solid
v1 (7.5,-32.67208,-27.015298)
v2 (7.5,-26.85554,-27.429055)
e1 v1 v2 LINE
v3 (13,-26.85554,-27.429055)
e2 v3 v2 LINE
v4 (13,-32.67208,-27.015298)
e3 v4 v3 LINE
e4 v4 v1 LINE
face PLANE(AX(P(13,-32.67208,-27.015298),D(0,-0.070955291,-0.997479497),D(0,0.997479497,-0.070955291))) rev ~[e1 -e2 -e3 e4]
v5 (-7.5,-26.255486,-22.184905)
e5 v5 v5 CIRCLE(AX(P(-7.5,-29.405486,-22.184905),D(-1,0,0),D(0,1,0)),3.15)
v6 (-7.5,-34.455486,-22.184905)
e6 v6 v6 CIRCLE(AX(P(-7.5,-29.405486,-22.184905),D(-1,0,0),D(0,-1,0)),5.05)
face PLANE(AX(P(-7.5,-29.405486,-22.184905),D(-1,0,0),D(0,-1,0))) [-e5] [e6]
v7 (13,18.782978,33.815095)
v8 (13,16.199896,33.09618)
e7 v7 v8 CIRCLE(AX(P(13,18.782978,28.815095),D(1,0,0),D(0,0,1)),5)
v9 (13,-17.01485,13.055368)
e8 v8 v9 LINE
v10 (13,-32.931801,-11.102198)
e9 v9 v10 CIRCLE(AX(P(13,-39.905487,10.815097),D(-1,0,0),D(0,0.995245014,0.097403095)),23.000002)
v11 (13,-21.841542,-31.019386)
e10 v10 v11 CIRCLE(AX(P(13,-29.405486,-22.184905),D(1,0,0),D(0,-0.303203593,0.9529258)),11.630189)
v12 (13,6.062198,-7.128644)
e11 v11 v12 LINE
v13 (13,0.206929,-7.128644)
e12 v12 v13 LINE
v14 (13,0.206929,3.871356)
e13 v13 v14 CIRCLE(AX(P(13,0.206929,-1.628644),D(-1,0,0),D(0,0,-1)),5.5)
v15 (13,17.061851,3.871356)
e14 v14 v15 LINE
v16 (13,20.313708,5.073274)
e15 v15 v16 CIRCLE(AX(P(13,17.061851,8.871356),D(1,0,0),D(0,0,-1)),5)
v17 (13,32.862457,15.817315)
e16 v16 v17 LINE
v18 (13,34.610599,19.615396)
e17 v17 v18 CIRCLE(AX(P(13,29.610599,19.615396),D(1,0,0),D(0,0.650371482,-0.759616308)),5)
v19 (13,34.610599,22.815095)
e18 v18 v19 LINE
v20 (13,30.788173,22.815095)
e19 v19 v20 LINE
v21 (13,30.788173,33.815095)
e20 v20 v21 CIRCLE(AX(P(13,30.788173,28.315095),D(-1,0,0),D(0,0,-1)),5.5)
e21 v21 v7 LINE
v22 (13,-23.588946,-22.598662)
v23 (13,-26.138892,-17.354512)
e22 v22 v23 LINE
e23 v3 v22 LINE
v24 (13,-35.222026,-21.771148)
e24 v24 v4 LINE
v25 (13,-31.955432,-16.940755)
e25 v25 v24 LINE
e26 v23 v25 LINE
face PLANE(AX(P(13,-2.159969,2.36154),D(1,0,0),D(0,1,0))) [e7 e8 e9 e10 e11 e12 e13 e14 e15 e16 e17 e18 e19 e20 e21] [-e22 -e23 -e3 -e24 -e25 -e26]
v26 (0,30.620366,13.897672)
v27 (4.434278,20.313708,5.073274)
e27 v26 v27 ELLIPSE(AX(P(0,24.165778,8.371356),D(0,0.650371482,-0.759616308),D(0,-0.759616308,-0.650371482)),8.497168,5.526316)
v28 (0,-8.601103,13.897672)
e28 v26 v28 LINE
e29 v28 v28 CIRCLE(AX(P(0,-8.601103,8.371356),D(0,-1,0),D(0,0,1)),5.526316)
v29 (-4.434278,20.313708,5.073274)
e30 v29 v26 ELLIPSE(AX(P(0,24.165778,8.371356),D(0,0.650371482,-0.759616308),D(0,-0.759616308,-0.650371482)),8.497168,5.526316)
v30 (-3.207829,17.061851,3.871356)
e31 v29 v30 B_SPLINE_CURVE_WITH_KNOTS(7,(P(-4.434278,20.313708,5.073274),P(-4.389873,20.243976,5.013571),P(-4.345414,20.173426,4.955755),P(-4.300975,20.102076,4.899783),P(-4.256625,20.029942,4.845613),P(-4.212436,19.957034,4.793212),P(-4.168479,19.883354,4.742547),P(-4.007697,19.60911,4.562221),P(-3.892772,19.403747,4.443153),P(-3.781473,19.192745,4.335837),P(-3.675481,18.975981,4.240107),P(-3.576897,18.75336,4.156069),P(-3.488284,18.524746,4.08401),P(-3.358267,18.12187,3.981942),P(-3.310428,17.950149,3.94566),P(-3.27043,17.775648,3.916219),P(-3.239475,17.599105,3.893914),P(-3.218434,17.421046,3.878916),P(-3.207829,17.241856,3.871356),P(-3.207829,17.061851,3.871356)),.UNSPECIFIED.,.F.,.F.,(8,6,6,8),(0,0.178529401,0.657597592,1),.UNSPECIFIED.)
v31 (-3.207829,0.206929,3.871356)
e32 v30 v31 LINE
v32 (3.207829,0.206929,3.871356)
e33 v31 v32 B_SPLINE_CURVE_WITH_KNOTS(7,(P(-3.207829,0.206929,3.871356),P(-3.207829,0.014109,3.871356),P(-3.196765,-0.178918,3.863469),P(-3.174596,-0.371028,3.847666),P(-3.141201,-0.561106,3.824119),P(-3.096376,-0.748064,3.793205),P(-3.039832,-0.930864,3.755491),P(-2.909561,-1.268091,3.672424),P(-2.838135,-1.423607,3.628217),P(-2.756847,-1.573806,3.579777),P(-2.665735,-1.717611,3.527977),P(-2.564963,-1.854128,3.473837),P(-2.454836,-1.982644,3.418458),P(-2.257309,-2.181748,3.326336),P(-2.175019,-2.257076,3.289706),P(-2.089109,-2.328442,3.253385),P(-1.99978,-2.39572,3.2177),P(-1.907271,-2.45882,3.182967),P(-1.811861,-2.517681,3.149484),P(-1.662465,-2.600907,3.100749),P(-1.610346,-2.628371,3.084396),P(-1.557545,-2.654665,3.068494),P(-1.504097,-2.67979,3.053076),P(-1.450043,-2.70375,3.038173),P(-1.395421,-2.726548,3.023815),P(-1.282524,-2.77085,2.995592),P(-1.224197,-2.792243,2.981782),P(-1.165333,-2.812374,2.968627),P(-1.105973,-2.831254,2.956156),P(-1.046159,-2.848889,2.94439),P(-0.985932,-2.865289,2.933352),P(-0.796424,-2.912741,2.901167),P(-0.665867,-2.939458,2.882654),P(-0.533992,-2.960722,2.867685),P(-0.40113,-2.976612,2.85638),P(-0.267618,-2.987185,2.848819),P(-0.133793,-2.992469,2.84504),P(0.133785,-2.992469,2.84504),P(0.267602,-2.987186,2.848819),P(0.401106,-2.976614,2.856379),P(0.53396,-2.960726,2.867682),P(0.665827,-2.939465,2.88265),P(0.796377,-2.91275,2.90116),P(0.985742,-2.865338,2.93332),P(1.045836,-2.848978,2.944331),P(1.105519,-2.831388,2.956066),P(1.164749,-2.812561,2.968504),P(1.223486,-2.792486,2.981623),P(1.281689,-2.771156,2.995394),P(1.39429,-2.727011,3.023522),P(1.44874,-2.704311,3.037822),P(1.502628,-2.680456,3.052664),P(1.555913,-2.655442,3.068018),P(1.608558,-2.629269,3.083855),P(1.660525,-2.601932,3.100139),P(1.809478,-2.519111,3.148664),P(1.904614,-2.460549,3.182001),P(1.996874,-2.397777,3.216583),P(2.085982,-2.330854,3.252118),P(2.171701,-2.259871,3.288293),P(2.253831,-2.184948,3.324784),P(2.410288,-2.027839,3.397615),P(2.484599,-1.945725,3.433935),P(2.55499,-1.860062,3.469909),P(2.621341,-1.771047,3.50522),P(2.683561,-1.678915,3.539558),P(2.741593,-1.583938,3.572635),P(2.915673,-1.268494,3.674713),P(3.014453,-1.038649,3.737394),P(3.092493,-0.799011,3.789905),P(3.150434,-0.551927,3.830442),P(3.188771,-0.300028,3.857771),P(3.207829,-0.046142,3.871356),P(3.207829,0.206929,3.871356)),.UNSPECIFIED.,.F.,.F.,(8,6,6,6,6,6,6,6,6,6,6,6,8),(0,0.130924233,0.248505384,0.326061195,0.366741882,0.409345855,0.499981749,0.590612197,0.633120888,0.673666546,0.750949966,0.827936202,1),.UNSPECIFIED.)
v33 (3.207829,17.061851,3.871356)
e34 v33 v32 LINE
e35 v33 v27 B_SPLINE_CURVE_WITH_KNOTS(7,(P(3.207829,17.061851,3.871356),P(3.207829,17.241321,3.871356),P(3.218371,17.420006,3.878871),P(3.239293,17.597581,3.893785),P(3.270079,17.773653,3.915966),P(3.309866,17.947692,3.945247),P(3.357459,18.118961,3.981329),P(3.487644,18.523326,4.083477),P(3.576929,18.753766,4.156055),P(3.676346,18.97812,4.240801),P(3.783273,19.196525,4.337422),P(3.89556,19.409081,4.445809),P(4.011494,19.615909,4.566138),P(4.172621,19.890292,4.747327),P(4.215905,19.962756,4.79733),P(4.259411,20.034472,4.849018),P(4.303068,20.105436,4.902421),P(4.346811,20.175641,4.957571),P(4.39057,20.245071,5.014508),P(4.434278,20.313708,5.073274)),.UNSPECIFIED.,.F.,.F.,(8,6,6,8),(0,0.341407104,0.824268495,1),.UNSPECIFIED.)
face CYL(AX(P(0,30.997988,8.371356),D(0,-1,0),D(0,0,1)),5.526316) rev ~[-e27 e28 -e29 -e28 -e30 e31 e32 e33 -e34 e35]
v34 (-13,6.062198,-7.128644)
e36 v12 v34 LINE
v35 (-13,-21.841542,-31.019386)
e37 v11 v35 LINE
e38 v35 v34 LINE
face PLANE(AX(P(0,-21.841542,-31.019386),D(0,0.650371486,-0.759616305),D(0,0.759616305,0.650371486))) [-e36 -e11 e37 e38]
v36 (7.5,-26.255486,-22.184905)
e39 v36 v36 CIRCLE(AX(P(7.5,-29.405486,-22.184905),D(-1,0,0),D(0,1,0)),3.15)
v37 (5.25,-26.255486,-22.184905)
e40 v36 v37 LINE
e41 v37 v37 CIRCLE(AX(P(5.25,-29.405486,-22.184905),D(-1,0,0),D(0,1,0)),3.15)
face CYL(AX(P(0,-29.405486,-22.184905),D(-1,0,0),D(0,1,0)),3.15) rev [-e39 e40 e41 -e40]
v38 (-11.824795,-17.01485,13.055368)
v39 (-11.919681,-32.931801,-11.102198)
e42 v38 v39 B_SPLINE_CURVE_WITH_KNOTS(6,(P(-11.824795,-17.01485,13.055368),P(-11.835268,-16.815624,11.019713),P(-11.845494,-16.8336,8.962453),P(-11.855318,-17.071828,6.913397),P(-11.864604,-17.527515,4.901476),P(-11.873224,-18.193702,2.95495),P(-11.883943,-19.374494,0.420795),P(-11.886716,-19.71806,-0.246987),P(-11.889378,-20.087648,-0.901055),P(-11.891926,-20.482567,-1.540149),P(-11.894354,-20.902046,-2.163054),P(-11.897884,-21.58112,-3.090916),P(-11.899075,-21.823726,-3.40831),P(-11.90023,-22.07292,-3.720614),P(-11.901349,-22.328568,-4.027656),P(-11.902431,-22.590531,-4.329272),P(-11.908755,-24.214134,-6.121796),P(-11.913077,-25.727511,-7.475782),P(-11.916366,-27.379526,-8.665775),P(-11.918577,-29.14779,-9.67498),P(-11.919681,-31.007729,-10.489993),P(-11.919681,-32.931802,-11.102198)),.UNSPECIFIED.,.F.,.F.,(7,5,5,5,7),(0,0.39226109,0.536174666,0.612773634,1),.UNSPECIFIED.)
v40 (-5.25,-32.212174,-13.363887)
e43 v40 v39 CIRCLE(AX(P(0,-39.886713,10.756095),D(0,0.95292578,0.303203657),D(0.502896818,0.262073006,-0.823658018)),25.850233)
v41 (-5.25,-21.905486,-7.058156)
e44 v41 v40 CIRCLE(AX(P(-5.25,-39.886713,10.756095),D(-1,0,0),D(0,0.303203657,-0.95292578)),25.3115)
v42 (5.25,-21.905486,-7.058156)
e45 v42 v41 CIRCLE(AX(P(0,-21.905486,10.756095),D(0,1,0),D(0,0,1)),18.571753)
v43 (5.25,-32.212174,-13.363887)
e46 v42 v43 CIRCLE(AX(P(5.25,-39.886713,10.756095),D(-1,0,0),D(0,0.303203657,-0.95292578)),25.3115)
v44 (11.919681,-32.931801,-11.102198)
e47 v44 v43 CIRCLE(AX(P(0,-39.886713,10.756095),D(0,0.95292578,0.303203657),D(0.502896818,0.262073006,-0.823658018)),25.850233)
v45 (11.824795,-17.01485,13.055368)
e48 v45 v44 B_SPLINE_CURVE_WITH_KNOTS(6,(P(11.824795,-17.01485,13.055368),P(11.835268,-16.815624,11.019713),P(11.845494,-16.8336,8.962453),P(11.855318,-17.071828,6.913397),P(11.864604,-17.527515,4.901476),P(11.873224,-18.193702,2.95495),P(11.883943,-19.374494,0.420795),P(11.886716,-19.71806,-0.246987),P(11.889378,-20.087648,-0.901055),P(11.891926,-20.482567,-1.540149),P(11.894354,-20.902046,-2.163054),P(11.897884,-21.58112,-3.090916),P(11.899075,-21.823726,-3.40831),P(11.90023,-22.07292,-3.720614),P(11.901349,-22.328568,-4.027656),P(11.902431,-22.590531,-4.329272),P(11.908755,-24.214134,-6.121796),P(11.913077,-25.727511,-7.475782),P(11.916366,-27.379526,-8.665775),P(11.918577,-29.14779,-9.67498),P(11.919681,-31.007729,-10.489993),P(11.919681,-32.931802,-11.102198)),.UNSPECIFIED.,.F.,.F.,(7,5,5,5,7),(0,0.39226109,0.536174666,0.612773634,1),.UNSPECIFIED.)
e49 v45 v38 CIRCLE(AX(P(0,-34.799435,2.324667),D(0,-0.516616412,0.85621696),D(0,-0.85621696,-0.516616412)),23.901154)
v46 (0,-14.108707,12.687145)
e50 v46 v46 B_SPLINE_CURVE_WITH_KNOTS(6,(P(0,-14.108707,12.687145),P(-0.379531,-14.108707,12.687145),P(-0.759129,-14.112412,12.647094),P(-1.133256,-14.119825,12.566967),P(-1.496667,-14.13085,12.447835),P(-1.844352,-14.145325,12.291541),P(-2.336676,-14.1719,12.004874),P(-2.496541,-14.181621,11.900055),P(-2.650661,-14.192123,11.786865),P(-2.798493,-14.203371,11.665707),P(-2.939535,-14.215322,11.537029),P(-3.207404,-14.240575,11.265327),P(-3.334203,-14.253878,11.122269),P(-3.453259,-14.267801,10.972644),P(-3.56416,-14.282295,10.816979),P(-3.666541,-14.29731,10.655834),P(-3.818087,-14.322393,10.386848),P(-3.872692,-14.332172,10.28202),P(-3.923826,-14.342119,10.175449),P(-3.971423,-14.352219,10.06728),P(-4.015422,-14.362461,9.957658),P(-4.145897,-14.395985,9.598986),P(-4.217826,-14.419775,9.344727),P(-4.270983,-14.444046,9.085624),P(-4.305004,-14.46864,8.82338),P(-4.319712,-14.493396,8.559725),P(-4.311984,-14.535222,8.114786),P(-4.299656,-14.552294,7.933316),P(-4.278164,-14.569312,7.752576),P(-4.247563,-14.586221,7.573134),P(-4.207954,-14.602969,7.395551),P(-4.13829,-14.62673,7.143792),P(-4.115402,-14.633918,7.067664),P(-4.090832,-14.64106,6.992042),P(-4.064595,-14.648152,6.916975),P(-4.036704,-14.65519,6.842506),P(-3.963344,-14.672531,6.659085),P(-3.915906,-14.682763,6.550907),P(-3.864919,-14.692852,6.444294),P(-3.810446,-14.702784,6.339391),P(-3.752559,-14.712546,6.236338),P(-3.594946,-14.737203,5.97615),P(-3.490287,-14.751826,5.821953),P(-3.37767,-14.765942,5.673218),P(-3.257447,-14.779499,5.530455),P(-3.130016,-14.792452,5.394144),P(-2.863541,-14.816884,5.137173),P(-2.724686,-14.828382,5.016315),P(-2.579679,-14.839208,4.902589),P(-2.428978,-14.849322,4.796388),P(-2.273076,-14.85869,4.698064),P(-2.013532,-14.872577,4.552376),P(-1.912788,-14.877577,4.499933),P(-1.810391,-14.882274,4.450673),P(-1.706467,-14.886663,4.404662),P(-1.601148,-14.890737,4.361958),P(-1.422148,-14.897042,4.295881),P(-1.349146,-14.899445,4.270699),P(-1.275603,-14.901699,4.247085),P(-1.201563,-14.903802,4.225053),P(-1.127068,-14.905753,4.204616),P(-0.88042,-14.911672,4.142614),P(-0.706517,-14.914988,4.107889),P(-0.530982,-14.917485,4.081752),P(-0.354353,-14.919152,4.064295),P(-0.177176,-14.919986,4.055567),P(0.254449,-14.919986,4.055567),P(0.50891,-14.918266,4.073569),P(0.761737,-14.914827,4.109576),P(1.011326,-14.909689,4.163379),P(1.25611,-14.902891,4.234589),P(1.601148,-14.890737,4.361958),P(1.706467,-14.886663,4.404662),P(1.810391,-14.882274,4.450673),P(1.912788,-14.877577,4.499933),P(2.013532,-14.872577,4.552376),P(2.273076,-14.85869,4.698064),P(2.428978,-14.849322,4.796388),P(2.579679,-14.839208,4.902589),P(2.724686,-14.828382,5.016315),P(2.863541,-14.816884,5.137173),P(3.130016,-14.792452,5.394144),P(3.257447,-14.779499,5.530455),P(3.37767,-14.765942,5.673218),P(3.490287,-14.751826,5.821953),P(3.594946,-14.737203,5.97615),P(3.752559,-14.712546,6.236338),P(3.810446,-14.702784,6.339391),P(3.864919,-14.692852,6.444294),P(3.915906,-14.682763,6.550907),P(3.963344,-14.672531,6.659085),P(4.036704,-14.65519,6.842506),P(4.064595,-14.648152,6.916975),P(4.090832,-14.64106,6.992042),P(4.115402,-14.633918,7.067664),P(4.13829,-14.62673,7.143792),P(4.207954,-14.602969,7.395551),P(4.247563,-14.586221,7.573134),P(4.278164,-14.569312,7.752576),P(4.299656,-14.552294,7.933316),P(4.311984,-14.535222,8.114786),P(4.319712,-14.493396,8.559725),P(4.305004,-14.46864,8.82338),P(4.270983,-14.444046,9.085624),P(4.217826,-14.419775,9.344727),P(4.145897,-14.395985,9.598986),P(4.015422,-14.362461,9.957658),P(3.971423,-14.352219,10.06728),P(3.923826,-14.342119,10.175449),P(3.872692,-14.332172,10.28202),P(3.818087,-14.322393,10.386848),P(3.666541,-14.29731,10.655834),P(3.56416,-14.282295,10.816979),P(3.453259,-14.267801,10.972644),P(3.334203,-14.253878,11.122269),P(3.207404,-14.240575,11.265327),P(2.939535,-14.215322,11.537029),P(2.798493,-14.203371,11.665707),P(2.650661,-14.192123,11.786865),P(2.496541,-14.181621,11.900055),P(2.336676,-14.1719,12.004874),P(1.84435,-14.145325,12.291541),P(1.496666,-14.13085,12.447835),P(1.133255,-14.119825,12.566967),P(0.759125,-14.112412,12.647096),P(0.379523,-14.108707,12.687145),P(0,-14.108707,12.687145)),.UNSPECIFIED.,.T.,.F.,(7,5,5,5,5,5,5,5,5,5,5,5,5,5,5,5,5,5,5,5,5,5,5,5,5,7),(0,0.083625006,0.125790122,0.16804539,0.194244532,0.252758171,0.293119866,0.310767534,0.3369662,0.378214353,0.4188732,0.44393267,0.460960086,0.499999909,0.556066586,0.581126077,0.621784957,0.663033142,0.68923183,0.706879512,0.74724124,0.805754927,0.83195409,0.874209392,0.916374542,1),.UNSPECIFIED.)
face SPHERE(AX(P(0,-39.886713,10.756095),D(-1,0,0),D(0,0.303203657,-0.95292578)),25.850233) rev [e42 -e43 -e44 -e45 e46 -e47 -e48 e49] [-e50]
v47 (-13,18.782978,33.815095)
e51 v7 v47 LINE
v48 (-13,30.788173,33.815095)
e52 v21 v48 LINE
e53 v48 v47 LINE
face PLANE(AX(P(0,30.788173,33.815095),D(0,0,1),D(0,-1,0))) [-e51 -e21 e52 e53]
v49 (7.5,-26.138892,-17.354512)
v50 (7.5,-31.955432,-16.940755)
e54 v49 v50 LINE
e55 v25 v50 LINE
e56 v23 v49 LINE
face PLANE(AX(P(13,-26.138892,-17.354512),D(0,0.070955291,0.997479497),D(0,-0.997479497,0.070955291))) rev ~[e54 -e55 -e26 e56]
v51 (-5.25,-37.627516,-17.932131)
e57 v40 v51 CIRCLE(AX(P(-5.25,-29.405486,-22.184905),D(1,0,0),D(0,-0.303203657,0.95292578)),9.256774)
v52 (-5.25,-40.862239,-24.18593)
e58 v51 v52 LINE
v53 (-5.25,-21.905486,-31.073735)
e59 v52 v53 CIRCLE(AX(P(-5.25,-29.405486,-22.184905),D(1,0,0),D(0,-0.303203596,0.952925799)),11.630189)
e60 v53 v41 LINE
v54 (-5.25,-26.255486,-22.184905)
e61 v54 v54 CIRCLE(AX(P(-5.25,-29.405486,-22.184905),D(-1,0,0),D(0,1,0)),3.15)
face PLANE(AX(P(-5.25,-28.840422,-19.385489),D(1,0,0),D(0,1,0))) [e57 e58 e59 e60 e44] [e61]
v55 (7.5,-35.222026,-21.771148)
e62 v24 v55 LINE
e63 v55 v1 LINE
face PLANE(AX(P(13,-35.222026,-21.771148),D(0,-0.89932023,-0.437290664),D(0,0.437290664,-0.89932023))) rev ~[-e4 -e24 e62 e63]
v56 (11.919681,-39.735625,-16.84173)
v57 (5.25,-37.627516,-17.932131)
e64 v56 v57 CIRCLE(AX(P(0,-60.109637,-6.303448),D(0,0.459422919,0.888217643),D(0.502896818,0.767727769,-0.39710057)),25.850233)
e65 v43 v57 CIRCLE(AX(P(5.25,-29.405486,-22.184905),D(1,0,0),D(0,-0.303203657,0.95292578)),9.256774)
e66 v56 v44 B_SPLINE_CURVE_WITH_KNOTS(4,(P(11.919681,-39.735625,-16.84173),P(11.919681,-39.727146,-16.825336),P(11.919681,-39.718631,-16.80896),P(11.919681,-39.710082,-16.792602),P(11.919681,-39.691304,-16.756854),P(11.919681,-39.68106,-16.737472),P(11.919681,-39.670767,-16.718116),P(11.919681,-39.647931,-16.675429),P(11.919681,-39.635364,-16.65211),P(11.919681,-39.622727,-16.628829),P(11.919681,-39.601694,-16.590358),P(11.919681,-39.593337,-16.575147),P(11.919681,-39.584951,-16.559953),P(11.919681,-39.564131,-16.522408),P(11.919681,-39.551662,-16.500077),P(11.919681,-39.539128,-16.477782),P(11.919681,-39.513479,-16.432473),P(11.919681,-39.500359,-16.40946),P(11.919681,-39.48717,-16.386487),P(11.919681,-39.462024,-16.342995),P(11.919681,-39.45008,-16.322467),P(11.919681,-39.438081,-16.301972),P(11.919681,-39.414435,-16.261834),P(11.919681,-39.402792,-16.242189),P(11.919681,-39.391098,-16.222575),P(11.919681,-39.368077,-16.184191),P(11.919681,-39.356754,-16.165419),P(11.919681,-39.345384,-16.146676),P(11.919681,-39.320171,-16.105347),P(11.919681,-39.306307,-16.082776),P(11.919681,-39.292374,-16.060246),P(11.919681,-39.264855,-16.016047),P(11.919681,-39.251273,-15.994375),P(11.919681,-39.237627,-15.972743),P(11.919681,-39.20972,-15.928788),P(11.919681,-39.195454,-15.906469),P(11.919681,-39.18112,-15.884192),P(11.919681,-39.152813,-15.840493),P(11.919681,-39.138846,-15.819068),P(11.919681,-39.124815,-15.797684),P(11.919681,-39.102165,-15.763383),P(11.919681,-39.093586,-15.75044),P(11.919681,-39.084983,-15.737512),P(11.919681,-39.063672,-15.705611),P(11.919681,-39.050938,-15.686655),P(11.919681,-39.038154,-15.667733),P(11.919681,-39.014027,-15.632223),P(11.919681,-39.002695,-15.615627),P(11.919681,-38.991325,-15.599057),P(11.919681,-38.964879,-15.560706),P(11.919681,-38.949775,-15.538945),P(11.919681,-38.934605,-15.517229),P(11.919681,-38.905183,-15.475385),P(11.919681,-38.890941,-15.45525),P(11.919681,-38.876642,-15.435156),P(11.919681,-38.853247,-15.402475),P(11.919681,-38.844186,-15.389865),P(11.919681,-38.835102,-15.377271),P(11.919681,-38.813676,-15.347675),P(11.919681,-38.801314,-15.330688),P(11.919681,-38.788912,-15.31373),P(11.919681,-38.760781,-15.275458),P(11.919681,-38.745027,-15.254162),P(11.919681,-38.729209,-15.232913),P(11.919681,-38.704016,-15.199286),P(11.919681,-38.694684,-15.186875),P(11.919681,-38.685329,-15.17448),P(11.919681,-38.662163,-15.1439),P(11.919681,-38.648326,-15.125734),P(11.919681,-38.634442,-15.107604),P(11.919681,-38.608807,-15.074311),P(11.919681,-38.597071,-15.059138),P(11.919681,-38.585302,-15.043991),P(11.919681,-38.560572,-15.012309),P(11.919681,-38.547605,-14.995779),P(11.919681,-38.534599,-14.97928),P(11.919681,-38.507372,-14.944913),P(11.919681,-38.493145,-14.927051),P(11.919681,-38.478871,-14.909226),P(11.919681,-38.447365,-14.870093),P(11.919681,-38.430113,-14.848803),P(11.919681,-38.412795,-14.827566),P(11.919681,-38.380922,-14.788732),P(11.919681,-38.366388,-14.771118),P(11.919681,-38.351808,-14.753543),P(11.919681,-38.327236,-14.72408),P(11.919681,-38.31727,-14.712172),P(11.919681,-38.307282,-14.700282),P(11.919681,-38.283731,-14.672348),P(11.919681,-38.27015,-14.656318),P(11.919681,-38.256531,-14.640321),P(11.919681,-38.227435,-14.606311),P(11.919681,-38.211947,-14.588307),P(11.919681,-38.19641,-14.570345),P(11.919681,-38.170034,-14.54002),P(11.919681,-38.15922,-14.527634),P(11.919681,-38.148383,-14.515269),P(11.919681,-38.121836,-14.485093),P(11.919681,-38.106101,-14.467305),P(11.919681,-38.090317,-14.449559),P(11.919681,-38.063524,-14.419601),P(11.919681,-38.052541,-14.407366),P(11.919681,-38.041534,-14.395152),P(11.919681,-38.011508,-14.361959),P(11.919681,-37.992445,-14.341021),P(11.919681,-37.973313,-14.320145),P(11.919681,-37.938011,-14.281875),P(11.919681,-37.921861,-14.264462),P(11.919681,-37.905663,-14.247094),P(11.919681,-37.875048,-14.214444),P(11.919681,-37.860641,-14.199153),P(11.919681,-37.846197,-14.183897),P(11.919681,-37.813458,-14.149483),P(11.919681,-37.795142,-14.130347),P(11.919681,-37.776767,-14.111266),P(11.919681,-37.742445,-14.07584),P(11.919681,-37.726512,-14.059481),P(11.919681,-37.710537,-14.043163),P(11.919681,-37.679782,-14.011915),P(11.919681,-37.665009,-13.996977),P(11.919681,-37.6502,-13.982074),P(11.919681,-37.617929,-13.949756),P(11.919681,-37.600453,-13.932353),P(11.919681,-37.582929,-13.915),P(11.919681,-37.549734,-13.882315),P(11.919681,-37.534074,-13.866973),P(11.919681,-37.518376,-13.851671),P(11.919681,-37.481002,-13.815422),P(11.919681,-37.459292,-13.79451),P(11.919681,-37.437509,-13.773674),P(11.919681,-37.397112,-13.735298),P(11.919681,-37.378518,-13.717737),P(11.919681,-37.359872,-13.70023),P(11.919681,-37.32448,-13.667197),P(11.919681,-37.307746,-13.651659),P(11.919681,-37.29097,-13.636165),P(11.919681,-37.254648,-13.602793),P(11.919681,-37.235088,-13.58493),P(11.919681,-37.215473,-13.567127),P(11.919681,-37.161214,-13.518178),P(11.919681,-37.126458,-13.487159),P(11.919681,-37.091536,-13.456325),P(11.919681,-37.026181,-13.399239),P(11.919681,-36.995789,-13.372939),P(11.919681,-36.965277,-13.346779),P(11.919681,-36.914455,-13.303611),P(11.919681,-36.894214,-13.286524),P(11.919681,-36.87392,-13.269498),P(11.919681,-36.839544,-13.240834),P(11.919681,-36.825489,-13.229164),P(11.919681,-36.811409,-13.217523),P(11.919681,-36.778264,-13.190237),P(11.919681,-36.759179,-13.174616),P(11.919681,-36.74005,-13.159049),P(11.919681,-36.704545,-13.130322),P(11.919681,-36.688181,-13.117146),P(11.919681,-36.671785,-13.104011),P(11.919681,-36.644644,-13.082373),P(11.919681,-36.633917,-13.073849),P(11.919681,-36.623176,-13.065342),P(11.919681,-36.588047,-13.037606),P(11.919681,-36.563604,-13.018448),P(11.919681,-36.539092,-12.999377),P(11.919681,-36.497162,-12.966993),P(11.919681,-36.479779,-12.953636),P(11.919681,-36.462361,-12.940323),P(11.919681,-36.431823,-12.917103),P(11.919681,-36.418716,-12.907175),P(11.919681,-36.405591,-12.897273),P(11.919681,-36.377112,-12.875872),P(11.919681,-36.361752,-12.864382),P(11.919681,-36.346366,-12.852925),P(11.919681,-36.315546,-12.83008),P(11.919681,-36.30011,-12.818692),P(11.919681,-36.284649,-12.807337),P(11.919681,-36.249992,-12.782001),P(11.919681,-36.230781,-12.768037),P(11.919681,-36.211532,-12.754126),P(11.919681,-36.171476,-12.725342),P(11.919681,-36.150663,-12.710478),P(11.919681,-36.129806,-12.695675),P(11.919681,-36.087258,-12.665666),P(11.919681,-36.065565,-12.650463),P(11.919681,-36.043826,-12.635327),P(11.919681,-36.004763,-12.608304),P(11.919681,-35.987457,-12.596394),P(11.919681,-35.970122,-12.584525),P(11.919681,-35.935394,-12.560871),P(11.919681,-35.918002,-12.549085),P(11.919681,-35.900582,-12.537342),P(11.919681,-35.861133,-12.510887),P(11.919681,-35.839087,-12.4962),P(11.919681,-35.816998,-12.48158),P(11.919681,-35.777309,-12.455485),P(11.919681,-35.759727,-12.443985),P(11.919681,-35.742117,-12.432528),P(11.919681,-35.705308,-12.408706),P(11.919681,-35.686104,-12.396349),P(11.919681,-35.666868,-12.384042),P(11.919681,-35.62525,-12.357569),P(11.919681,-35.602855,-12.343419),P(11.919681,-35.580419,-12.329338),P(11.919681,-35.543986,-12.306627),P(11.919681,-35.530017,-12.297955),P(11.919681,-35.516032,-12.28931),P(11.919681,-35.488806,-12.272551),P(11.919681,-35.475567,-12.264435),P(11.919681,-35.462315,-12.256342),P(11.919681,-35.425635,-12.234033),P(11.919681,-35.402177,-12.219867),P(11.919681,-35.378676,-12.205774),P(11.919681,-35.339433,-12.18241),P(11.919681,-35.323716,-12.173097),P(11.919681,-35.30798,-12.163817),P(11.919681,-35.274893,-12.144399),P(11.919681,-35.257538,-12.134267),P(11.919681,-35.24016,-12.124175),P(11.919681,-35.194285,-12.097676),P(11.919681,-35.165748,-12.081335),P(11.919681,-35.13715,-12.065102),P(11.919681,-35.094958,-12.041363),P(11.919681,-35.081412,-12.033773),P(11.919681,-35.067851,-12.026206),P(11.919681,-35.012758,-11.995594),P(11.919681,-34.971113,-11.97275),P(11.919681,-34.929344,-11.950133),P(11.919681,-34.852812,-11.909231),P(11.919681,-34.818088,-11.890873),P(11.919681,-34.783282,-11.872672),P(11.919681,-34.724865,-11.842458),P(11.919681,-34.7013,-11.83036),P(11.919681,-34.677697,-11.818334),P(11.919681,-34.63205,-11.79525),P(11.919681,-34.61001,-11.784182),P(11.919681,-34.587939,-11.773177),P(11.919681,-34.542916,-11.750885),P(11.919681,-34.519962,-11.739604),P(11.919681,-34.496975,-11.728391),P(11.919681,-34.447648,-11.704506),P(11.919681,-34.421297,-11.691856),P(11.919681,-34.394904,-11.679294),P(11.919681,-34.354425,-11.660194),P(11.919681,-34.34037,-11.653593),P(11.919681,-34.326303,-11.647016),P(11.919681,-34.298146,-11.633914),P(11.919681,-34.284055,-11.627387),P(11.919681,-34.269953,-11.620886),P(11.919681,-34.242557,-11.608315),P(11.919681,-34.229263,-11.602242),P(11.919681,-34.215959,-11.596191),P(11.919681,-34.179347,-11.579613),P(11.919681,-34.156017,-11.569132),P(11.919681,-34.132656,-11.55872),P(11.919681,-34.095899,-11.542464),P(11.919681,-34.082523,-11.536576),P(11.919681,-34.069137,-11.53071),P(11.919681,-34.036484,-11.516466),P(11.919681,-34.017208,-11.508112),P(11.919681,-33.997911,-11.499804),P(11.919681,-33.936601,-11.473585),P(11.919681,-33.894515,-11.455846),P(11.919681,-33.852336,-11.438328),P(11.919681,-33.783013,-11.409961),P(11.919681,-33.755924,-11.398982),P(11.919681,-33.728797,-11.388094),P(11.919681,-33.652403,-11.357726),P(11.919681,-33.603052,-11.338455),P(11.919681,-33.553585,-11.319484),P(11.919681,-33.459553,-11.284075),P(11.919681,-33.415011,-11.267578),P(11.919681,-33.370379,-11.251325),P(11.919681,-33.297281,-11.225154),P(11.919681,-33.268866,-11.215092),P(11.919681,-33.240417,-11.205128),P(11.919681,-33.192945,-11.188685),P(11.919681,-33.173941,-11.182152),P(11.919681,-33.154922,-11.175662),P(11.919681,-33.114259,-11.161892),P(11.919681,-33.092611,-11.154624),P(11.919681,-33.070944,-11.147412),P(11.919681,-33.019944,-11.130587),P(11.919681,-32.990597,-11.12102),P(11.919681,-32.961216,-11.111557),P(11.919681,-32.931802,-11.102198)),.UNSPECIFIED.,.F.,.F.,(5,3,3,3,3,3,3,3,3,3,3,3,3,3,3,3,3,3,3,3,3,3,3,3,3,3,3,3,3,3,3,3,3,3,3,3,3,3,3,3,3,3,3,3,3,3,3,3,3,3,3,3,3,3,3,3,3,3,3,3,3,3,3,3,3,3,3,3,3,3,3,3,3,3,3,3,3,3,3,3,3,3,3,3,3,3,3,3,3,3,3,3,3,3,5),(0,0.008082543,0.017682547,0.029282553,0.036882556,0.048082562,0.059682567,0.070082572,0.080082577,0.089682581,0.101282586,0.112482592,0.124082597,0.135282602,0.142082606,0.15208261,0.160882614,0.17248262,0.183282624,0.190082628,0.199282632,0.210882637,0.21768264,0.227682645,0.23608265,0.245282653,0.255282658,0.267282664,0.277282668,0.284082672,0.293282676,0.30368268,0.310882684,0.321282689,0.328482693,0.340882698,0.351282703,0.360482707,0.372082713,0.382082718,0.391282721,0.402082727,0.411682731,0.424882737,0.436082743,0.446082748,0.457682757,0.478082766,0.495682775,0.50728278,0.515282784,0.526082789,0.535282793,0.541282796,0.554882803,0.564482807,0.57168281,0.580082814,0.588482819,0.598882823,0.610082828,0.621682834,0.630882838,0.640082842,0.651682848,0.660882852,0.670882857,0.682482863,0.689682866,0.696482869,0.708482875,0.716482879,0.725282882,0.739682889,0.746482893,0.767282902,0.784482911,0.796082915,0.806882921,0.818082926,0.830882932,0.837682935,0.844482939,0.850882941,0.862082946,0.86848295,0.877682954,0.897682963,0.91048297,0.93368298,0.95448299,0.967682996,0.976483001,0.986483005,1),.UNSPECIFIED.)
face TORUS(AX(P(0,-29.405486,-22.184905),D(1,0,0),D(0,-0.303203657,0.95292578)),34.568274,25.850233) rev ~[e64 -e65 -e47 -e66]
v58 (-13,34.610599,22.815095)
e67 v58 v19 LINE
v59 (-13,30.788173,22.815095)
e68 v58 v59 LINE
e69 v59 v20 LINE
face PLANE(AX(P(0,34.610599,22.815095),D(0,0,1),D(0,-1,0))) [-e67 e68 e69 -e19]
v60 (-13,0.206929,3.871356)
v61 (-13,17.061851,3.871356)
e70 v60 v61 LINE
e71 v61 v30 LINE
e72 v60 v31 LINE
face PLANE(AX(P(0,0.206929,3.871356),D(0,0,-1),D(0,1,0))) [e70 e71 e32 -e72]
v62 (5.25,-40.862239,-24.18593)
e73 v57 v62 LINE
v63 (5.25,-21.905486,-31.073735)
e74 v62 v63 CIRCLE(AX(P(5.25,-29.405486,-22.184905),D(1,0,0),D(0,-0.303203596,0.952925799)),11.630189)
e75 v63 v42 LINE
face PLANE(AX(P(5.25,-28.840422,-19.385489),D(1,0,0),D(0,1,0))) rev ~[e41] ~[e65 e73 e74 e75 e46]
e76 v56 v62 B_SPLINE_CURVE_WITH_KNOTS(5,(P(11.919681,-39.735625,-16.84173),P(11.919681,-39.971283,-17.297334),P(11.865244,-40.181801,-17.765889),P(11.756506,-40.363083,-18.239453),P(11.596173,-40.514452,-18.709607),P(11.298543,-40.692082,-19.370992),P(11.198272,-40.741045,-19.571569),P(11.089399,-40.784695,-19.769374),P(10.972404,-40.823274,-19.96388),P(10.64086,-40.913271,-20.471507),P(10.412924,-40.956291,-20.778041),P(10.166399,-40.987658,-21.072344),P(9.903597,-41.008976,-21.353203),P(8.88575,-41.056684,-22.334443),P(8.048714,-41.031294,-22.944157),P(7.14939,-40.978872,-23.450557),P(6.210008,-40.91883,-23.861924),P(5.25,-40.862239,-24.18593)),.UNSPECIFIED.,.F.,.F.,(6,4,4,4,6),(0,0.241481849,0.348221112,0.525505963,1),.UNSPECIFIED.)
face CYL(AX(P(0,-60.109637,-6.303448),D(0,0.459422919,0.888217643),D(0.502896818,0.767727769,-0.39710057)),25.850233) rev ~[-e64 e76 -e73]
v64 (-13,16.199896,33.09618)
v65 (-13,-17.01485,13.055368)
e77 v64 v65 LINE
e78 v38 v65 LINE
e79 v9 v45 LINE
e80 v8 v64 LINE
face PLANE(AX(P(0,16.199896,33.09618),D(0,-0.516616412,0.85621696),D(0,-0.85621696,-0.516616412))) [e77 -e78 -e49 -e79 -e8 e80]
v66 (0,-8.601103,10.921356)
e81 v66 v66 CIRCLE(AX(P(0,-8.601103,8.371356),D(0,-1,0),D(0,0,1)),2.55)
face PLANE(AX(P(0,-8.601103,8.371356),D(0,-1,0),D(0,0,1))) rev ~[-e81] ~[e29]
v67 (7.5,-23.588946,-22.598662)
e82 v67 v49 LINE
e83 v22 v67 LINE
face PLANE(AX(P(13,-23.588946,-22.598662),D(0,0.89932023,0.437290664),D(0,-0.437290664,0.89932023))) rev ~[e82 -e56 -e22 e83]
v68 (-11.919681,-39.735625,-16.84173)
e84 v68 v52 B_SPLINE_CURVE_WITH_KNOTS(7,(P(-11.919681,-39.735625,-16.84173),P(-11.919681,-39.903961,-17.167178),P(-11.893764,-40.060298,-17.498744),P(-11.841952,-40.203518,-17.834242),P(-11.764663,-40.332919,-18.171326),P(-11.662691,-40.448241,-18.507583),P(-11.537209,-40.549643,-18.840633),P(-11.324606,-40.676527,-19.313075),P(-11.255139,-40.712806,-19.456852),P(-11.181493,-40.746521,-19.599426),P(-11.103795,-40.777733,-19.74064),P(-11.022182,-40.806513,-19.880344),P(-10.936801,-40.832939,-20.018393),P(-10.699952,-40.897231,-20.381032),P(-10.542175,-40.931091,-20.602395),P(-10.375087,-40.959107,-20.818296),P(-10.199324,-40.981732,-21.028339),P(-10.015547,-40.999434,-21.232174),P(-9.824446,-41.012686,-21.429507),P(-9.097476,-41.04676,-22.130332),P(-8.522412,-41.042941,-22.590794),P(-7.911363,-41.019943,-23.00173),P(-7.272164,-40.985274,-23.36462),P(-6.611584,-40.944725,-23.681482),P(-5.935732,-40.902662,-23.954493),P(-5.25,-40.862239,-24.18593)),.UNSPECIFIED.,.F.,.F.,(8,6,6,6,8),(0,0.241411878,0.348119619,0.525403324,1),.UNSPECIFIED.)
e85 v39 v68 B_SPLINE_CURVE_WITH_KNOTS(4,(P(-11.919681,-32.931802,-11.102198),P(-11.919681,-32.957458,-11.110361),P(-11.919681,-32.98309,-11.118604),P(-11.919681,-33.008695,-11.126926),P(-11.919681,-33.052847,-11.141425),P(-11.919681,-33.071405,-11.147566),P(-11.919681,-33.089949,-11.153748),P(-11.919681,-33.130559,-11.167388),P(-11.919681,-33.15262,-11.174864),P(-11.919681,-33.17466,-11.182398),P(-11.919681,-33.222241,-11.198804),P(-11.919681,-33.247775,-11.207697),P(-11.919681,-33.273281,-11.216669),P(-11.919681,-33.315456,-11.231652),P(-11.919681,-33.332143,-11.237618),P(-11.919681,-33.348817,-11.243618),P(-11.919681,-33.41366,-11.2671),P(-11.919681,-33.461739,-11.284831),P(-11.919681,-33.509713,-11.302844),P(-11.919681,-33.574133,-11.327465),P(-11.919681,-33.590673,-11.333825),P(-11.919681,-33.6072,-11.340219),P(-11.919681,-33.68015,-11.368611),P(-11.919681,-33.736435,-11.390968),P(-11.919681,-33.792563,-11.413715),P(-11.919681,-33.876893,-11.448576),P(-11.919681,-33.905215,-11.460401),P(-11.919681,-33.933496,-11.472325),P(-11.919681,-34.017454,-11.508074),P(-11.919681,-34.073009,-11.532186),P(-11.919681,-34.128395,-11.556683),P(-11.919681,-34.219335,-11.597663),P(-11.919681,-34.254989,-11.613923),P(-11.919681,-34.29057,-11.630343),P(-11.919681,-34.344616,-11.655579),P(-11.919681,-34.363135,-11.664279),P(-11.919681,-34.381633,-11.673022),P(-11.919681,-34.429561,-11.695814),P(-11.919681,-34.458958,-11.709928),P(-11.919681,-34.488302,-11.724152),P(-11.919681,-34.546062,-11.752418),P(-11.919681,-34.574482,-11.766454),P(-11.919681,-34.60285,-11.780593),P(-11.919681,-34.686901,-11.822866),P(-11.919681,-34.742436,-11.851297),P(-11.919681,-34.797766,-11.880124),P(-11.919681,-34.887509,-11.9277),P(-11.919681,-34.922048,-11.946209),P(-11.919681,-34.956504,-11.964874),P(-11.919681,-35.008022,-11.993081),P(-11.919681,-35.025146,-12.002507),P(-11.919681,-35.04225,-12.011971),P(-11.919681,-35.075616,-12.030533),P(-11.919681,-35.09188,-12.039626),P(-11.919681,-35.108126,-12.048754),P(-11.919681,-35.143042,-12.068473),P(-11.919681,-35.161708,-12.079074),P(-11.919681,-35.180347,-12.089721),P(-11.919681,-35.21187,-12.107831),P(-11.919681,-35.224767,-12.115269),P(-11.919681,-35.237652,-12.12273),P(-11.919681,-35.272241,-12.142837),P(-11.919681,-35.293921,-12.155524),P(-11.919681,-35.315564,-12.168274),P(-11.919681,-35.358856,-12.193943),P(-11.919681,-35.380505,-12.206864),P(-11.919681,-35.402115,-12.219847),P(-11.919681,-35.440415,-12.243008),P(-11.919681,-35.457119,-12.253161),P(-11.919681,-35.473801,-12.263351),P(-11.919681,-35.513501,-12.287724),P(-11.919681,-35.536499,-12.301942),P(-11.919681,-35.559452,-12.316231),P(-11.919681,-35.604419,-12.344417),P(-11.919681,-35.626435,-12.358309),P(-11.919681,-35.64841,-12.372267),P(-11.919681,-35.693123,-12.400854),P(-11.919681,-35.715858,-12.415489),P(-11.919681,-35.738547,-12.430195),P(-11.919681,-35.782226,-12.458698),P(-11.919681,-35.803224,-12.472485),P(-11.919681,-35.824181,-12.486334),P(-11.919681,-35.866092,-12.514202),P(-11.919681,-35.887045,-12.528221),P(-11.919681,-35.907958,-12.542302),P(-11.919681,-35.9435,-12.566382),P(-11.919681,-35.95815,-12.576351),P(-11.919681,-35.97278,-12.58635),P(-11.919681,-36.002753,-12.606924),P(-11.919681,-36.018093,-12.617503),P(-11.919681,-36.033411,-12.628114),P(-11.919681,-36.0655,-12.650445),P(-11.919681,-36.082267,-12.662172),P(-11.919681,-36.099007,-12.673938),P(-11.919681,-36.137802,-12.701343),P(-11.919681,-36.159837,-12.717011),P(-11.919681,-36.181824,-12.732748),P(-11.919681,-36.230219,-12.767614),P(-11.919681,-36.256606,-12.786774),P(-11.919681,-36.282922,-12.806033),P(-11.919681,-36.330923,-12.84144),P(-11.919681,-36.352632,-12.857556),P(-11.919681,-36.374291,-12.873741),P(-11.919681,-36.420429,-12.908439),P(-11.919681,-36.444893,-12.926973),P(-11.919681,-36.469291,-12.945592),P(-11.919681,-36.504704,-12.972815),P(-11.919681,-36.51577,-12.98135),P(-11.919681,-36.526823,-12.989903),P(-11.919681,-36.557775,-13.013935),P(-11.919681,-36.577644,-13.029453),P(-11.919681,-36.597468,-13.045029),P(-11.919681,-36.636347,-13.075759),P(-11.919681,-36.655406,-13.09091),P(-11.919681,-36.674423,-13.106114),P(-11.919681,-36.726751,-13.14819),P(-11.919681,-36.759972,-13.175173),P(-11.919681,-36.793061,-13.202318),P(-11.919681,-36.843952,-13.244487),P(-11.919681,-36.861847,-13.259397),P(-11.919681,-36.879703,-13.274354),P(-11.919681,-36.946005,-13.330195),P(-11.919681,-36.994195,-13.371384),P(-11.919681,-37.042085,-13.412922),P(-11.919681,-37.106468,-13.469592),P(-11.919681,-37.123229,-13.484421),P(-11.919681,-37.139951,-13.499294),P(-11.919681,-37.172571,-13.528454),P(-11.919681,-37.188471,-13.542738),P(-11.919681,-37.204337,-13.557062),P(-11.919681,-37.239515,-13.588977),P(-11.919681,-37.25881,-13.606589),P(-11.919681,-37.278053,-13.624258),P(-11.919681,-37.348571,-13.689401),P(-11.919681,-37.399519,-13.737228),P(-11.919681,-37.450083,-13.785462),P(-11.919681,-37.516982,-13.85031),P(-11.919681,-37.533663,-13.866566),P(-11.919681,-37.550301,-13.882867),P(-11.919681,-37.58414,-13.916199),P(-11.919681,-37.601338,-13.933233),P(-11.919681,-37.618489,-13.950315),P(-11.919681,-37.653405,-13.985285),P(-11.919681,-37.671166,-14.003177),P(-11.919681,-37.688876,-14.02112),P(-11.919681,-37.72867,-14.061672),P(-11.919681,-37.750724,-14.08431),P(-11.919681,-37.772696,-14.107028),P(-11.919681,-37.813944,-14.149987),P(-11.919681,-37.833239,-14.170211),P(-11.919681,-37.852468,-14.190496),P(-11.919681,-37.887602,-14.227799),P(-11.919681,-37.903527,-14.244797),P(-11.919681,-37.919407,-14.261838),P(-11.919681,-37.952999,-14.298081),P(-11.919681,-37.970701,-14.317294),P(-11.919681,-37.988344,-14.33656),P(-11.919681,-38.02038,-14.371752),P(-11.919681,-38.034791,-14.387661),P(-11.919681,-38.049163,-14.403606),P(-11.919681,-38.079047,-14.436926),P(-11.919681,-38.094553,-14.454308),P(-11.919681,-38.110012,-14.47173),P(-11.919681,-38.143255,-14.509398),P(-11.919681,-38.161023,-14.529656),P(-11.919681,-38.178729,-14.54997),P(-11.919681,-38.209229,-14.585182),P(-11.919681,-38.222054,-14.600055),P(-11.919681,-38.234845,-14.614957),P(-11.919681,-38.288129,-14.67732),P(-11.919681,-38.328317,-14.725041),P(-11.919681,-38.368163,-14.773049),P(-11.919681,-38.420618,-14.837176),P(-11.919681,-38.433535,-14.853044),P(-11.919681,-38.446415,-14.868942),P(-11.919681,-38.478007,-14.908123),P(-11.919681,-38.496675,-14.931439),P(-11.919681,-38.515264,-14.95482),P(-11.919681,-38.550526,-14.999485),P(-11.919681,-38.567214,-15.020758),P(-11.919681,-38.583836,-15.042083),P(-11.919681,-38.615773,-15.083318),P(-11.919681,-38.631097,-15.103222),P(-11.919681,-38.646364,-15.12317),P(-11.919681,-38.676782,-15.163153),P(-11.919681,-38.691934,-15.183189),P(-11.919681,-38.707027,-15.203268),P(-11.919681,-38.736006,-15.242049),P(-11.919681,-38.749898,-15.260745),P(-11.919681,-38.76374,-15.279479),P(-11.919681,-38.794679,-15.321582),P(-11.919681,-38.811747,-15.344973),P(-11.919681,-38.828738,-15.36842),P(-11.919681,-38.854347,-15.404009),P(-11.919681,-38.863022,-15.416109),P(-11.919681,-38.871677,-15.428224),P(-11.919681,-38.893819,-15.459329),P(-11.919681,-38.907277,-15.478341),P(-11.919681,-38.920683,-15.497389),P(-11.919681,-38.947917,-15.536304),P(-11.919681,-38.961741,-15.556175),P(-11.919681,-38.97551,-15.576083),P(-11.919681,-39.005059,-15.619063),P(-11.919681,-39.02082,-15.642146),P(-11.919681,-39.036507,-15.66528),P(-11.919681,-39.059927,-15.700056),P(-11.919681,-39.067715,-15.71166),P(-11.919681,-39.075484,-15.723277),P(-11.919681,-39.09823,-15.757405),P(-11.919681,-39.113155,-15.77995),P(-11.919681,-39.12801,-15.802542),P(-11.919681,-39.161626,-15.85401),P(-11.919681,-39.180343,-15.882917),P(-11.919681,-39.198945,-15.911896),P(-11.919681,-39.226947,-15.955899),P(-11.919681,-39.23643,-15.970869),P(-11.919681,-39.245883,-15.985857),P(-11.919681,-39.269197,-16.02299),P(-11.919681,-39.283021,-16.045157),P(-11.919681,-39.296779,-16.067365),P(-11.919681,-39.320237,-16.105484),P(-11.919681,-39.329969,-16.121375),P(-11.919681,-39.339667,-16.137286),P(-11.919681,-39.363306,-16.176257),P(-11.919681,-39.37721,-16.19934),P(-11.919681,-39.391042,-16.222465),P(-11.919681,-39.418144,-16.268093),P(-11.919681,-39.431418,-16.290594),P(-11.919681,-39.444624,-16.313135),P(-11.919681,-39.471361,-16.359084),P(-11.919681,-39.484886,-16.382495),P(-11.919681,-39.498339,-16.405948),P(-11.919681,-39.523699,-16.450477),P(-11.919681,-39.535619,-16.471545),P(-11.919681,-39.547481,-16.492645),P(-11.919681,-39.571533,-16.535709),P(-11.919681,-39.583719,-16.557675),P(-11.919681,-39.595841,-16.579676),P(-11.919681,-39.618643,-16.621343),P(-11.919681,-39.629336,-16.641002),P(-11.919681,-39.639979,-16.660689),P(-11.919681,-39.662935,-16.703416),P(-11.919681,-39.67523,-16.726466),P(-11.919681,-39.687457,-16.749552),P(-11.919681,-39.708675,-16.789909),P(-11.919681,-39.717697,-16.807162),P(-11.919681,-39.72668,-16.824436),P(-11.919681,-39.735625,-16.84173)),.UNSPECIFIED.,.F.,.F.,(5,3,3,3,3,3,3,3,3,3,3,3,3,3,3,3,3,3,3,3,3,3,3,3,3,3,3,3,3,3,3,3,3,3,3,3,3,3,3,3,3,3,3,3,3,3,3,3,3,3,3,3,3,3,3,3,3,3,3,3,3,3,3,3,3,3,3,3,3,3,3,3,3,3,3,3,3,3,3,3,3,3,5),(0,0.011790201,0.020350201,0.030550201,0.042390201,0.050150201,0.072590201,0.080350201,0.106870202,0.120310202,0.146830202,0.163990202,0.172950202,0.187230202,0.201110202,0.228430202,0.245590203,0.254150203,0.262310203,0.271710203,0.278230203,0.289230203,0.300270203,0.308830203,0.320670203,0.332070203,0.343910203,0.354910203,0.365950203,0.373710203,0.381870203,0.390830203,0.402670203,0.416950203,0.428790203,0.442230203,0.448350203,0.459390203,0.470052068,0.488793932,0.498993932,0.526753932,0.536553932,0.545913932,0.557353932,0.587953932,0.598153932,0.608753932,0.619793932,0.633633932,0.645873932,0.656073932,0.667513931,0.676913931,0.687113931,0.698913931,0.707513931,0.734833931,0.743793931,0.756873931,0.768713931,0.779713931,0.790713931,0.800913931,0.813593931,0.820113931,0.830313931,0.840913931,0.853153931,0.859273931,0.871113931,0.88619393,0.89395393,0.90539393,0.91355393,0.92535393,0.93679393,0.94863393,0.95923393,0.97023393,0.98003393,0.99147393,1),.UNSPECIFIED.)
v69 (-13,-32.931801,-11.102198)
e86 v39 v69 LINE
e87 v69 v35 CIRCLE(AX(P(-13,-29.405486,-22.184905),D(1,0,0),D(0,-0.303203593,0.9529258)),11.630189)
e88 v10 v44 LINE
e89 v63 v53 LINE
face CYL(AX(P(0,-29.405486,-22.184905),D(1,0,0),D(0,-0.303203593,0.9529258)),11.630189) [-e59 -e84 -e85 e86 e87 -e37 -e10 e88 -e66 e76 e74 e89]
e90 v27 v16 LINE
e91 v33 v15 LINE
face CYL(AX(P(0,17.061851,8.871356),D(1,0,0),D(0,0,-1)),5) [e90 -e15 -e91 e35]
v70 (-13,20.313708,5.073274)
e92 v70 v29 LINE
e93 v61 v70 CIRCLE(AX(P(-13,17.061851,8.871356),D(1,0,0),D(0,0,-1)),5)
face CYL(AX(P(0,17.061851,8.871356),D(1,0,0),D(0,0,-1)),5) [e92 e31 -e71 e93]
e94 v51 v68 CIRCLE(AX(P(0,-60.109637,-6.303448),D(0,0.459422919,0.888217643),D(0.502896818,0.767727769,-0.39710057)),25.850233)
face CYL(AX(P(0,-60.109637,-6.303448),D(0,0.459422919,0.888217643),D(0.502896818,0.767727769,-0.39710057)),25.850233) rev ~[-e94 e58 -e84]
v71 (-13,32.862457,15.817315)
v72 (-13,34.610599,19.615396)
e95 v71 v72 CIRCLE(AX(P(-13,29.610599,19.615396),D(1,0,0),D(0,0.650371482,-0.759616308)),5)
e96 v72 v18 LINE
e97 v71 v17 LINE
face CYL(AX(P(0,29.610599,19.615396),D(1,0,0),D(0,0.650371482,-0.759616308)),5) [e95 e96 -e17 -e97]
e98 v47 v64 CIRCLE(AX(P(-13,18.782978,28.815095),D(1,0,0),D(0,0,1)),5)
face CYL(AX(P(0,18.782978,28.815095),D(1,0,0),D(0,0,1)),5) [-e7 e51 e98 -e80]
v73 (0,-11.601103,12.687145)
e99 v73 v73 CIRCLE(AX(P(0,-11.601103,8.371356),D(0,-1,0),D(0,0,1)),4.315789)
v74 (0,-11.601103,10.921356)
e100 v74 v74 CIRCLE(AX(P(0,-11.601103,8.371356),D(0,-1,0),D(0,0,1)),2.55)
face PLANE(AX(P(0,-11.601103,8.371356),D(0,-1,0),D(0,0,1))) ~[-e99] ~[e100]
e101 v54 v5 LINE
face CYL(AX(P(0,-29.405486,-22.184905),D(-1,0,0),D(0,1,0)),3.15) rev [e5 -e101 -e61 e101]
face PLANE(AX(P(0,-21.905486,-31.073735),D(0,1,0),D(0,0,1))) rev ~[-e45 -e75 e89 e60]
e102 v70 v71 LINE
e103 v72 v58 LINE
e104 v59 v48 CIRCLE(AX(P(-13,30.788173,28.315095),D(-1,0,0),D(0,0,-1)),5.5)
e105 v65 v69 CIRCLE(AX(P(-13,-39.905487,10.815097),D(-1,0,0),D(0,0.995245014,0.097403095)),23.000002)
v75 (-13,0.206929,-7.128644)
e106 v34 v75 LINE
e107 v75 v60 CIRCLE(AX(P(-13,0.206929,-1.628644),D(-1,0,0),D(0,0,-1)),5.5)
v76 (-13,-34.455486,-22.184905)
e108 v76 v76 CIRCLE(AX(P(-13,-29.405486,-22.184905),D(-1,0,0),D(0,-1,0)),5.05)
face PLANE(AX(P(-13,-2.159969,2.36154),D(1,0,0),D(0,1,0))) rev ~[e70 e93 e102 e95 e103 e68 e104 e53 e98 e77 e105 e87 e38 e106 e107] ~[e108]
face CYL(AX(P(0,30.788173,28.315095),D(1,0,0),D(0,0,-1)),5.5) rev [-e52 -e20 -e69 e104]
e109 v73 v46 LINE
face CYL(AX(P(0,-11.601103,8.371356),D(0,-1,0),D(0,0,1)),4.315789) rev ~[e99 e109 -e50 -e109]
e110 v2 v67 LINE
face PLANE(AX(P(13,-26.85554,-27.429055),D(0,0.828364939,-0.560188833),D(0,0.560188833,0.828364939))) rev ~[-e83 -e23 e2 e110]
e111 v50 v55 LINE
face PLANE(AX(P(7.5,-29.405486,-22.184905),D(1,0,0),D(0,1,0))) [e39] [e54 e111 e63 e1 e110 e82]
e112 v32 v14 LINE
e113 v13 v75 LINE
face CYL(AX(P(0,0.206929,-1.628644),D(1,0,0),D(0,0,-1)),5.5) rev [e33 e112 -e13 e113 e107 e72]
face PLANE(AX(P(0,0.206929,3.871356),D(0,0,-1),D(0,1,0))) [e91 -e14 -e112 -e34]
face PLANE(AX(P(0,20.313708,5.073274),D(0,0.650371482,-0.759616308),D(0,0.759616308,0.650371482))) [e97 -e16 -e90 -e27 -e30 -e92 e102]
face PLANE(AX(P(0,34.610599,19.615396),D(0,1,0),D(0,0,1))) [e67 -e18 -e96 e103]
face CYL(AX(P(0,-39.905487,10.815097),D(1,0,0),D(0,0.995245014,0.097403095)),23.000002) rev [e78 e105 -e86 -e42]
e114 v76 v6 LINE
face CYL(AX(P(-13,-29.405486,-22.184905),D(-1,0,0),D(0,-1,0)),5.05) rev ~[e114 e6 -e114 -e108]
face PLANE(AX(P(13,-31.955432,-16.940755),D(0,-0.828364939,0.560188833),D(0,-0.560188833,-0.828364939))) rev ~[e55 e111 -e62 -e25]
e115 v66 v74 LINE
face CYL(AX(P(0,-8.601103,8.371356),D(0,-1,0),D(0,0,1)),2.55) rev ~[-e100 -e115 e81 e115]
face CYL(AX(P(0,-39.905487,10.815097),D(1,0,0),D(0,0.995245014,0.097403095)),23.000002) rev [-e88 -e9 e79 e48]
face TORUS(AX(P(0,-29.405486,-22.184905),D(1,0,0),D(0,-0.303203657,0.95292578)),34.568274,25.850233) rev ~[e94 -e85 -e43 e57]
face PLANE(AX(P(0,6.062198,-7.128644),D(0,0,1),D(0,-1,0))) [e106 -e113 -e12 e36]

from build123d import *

# Parameters (mm, degrees)
F0_R      = 3.15
F1_DEPTH  = 13
F3_DEPTH  = 5.25
F5_DEPTH  = 5.5
F6_R      = 5.05
F7_DEPTH  = 5.5
F13_ANGLE = 45
F14_DEPTH = 15.67431457


# Not quite as in the source:
# - ends of sketch curves that miss each other by under 0.0002 mm in the source are joined


with BuildPart() as f1:
    # F0 (on Right) → F1 (new body, symmetric)
    with BuildSketch(Plane.YZ):
        with BuildLine():
            ThreePointArc((0.206929, -7.128644), (-5.293071, -1.628644), (0.206929, 3.871356))
            Line((0.206929, 3.871356), (17.0618508568, 3.871356))
            ThreePointArc((17.0618508568, 3.871356), (18.7952856408, 4.1814515394), (20.3137082671, 5.0732744602))
            Line((20.3137082671, 5.0732744602), (32.8624566897, 15.8173146076))
            ThreePointArc((32.8624566897, 15.8173146076), (34.1525860171, 17.5248563908), (34.6105992794, 19.6153961475))
            Line((34.6105992794, 19.6153961475), (34.6105992794, 22.815095))
            Line((34.6105992794, 22.815095), (30.788173, 22.815095))
            ThreePointArc((30.788173, 22.815095), (25.288173, 28.315095), (30.788173, 33.815095))
            Line((30.788173, 33.815095), (18.7829781294, 33.815095))
            ThreePointArc((18.7829781294, 33.815095), (17.4423484261, 33.6320143473), (16.1998960673, 33.0961797995))
            Line((16.1998960673, 33.0961797995), (-17.01485, 13.055368))
            ThreePointArc((-17.01485, 13.055368), (-20.6995911511, -1.839295663), (-32.9318010984, -11.1021976908))
            ThreePointArc((-32.9318010984, -11.1021976908), (-39.5666476125, -27.8428278397), (-21.8415422013, -31.0193857649))
            Line((-21.8415422013, -31.0193857649), (6.062198, -7.128644))
            Line((6.062198, -7.128644), (0.206929, -7.128644))
        make_face()
        with Locations((-29.405486, -22.184905)):
            Circle(F0_R, mode=Mode.SUBTRACT)
    extrude(amount=F1_DEPTH, both=True)

    # F2 (on Right) → F3 (cut, symmetric)
    with BuildSketch(Plane.YZ):
        with BuildLine():
            ThreePointArc((-21.905486, -3.502726), (-26.8533127567, -8.1227182817), (-32.9318011292, -11.1021976663))
            ThreePointArc((-32.9318011292, -11.1021976663), (-39.5869945241, -27.806130876), (-21.905486, -31.0737348541))
            Line((-21.905486, -31.0737348541), (-21.905486, -3.502726))
        make_face()
    extrude(amount=F3_DEPTH, both=True, mode=Mode.SUBTRACT)

    # F4 (on face) → F5 (cut)
    with BuildSketch(Plane.YZ.offset(13)):
        Polygon((-26.8555401867, -27.4290550439), (-23.5889459341, -22.5986621693), (-26.1388917474, -17.3545121255), (-31.9554318133, -16.9407549561), (-35.2220260659, -21.7711478307), (-32.6720802526, -27.0152978745), align=None)
    extrude(amount=-F5_DEPTH, mode=Mode.SUBTRACT)

    # F6 (on face) → F7 (cut)
    with BuildSketch(Plane(origin=(-13, 0, 0), x_dir=(0, -1, 0), z_dir=(-1, 0, 0))):
        with Locations((29.405486, -22.184905)):
            Circle(F6_R)
    extrude(amount=-F7_DEPTH, mode=Mode.SUBTRACT)

    # F8 (on Right) → F9 (revolve, cut)
    with BuildSketch(Plane.YZ):
        Polygon((30.9979878552, 13.8976717895), (-8.6011026711, 13.8976717895), (-8.6011026711, 10.921356), (-11.6011026711, 10.921356), (-11.6011026711, 12.6871454737), (-20.2870493605, 12.6871454737), (-20.375526354, 8.371356), (30.9979878552, 8.371356), align=None)
    revolve(axis=Axis((0, 5.3112307506, 8.371356), (0, -1, 0)), mode=Mode.SUBTRACT)

    # F11 (on 3pt) → F12 (revolve, cut)
    with BuildSketch(Plane(origin=(0, -33.1120649043, -10.535657015), x_dir=(-1, 0, 0), z_dir=(0, 0.95292578, 0.3032036573))):
        with BuildLine():
            Line((13, 0), (-13, 0))
            ThreePointArc((-13, 0), (0, -3.5066758251), (13, 0))
        make_face()
    revolve(axis=Axis((6.7580873147, -39.8867132027, 10.75609478), (1, 0, 0)), mode=Mode.SUBTRACT)

    # F11 (on 3pt) → F13 (revolve, cut)
    with BuildSketch(Plane(origin=(0, -33.1120649043, -10.535657015), x_dir=(-1, 0, 0), z_dir=(0, 0.95292578, 0.3032036573))):
        with BuildLine():
            Line((13, 0), (-13, 0))
            ThreePointArc((-13, 0), (0, -3.5066758251), (13, 0))
        make_face()
    revolve(axis=Axis((6.5, -29.405486, -22.184905), (1, 0, 0)), revolution_arc=F13_ANGLE, mode=Mode.SUBTRACT)

    # F14 (cut, through all): faces of the model
    f14_faces = [f1.faces().sort_by_distance(p)[0] for p in [
        (-7.6184233171, -38.9779934398, -17.2336080484),
        (7.6184233311, -38.9779934508, -17.2336080427),
    ]]
    extrude(f14_faces, amount=-F14_DEPTH, mode=Mode.SUBTRACT)


solid = f1.part
